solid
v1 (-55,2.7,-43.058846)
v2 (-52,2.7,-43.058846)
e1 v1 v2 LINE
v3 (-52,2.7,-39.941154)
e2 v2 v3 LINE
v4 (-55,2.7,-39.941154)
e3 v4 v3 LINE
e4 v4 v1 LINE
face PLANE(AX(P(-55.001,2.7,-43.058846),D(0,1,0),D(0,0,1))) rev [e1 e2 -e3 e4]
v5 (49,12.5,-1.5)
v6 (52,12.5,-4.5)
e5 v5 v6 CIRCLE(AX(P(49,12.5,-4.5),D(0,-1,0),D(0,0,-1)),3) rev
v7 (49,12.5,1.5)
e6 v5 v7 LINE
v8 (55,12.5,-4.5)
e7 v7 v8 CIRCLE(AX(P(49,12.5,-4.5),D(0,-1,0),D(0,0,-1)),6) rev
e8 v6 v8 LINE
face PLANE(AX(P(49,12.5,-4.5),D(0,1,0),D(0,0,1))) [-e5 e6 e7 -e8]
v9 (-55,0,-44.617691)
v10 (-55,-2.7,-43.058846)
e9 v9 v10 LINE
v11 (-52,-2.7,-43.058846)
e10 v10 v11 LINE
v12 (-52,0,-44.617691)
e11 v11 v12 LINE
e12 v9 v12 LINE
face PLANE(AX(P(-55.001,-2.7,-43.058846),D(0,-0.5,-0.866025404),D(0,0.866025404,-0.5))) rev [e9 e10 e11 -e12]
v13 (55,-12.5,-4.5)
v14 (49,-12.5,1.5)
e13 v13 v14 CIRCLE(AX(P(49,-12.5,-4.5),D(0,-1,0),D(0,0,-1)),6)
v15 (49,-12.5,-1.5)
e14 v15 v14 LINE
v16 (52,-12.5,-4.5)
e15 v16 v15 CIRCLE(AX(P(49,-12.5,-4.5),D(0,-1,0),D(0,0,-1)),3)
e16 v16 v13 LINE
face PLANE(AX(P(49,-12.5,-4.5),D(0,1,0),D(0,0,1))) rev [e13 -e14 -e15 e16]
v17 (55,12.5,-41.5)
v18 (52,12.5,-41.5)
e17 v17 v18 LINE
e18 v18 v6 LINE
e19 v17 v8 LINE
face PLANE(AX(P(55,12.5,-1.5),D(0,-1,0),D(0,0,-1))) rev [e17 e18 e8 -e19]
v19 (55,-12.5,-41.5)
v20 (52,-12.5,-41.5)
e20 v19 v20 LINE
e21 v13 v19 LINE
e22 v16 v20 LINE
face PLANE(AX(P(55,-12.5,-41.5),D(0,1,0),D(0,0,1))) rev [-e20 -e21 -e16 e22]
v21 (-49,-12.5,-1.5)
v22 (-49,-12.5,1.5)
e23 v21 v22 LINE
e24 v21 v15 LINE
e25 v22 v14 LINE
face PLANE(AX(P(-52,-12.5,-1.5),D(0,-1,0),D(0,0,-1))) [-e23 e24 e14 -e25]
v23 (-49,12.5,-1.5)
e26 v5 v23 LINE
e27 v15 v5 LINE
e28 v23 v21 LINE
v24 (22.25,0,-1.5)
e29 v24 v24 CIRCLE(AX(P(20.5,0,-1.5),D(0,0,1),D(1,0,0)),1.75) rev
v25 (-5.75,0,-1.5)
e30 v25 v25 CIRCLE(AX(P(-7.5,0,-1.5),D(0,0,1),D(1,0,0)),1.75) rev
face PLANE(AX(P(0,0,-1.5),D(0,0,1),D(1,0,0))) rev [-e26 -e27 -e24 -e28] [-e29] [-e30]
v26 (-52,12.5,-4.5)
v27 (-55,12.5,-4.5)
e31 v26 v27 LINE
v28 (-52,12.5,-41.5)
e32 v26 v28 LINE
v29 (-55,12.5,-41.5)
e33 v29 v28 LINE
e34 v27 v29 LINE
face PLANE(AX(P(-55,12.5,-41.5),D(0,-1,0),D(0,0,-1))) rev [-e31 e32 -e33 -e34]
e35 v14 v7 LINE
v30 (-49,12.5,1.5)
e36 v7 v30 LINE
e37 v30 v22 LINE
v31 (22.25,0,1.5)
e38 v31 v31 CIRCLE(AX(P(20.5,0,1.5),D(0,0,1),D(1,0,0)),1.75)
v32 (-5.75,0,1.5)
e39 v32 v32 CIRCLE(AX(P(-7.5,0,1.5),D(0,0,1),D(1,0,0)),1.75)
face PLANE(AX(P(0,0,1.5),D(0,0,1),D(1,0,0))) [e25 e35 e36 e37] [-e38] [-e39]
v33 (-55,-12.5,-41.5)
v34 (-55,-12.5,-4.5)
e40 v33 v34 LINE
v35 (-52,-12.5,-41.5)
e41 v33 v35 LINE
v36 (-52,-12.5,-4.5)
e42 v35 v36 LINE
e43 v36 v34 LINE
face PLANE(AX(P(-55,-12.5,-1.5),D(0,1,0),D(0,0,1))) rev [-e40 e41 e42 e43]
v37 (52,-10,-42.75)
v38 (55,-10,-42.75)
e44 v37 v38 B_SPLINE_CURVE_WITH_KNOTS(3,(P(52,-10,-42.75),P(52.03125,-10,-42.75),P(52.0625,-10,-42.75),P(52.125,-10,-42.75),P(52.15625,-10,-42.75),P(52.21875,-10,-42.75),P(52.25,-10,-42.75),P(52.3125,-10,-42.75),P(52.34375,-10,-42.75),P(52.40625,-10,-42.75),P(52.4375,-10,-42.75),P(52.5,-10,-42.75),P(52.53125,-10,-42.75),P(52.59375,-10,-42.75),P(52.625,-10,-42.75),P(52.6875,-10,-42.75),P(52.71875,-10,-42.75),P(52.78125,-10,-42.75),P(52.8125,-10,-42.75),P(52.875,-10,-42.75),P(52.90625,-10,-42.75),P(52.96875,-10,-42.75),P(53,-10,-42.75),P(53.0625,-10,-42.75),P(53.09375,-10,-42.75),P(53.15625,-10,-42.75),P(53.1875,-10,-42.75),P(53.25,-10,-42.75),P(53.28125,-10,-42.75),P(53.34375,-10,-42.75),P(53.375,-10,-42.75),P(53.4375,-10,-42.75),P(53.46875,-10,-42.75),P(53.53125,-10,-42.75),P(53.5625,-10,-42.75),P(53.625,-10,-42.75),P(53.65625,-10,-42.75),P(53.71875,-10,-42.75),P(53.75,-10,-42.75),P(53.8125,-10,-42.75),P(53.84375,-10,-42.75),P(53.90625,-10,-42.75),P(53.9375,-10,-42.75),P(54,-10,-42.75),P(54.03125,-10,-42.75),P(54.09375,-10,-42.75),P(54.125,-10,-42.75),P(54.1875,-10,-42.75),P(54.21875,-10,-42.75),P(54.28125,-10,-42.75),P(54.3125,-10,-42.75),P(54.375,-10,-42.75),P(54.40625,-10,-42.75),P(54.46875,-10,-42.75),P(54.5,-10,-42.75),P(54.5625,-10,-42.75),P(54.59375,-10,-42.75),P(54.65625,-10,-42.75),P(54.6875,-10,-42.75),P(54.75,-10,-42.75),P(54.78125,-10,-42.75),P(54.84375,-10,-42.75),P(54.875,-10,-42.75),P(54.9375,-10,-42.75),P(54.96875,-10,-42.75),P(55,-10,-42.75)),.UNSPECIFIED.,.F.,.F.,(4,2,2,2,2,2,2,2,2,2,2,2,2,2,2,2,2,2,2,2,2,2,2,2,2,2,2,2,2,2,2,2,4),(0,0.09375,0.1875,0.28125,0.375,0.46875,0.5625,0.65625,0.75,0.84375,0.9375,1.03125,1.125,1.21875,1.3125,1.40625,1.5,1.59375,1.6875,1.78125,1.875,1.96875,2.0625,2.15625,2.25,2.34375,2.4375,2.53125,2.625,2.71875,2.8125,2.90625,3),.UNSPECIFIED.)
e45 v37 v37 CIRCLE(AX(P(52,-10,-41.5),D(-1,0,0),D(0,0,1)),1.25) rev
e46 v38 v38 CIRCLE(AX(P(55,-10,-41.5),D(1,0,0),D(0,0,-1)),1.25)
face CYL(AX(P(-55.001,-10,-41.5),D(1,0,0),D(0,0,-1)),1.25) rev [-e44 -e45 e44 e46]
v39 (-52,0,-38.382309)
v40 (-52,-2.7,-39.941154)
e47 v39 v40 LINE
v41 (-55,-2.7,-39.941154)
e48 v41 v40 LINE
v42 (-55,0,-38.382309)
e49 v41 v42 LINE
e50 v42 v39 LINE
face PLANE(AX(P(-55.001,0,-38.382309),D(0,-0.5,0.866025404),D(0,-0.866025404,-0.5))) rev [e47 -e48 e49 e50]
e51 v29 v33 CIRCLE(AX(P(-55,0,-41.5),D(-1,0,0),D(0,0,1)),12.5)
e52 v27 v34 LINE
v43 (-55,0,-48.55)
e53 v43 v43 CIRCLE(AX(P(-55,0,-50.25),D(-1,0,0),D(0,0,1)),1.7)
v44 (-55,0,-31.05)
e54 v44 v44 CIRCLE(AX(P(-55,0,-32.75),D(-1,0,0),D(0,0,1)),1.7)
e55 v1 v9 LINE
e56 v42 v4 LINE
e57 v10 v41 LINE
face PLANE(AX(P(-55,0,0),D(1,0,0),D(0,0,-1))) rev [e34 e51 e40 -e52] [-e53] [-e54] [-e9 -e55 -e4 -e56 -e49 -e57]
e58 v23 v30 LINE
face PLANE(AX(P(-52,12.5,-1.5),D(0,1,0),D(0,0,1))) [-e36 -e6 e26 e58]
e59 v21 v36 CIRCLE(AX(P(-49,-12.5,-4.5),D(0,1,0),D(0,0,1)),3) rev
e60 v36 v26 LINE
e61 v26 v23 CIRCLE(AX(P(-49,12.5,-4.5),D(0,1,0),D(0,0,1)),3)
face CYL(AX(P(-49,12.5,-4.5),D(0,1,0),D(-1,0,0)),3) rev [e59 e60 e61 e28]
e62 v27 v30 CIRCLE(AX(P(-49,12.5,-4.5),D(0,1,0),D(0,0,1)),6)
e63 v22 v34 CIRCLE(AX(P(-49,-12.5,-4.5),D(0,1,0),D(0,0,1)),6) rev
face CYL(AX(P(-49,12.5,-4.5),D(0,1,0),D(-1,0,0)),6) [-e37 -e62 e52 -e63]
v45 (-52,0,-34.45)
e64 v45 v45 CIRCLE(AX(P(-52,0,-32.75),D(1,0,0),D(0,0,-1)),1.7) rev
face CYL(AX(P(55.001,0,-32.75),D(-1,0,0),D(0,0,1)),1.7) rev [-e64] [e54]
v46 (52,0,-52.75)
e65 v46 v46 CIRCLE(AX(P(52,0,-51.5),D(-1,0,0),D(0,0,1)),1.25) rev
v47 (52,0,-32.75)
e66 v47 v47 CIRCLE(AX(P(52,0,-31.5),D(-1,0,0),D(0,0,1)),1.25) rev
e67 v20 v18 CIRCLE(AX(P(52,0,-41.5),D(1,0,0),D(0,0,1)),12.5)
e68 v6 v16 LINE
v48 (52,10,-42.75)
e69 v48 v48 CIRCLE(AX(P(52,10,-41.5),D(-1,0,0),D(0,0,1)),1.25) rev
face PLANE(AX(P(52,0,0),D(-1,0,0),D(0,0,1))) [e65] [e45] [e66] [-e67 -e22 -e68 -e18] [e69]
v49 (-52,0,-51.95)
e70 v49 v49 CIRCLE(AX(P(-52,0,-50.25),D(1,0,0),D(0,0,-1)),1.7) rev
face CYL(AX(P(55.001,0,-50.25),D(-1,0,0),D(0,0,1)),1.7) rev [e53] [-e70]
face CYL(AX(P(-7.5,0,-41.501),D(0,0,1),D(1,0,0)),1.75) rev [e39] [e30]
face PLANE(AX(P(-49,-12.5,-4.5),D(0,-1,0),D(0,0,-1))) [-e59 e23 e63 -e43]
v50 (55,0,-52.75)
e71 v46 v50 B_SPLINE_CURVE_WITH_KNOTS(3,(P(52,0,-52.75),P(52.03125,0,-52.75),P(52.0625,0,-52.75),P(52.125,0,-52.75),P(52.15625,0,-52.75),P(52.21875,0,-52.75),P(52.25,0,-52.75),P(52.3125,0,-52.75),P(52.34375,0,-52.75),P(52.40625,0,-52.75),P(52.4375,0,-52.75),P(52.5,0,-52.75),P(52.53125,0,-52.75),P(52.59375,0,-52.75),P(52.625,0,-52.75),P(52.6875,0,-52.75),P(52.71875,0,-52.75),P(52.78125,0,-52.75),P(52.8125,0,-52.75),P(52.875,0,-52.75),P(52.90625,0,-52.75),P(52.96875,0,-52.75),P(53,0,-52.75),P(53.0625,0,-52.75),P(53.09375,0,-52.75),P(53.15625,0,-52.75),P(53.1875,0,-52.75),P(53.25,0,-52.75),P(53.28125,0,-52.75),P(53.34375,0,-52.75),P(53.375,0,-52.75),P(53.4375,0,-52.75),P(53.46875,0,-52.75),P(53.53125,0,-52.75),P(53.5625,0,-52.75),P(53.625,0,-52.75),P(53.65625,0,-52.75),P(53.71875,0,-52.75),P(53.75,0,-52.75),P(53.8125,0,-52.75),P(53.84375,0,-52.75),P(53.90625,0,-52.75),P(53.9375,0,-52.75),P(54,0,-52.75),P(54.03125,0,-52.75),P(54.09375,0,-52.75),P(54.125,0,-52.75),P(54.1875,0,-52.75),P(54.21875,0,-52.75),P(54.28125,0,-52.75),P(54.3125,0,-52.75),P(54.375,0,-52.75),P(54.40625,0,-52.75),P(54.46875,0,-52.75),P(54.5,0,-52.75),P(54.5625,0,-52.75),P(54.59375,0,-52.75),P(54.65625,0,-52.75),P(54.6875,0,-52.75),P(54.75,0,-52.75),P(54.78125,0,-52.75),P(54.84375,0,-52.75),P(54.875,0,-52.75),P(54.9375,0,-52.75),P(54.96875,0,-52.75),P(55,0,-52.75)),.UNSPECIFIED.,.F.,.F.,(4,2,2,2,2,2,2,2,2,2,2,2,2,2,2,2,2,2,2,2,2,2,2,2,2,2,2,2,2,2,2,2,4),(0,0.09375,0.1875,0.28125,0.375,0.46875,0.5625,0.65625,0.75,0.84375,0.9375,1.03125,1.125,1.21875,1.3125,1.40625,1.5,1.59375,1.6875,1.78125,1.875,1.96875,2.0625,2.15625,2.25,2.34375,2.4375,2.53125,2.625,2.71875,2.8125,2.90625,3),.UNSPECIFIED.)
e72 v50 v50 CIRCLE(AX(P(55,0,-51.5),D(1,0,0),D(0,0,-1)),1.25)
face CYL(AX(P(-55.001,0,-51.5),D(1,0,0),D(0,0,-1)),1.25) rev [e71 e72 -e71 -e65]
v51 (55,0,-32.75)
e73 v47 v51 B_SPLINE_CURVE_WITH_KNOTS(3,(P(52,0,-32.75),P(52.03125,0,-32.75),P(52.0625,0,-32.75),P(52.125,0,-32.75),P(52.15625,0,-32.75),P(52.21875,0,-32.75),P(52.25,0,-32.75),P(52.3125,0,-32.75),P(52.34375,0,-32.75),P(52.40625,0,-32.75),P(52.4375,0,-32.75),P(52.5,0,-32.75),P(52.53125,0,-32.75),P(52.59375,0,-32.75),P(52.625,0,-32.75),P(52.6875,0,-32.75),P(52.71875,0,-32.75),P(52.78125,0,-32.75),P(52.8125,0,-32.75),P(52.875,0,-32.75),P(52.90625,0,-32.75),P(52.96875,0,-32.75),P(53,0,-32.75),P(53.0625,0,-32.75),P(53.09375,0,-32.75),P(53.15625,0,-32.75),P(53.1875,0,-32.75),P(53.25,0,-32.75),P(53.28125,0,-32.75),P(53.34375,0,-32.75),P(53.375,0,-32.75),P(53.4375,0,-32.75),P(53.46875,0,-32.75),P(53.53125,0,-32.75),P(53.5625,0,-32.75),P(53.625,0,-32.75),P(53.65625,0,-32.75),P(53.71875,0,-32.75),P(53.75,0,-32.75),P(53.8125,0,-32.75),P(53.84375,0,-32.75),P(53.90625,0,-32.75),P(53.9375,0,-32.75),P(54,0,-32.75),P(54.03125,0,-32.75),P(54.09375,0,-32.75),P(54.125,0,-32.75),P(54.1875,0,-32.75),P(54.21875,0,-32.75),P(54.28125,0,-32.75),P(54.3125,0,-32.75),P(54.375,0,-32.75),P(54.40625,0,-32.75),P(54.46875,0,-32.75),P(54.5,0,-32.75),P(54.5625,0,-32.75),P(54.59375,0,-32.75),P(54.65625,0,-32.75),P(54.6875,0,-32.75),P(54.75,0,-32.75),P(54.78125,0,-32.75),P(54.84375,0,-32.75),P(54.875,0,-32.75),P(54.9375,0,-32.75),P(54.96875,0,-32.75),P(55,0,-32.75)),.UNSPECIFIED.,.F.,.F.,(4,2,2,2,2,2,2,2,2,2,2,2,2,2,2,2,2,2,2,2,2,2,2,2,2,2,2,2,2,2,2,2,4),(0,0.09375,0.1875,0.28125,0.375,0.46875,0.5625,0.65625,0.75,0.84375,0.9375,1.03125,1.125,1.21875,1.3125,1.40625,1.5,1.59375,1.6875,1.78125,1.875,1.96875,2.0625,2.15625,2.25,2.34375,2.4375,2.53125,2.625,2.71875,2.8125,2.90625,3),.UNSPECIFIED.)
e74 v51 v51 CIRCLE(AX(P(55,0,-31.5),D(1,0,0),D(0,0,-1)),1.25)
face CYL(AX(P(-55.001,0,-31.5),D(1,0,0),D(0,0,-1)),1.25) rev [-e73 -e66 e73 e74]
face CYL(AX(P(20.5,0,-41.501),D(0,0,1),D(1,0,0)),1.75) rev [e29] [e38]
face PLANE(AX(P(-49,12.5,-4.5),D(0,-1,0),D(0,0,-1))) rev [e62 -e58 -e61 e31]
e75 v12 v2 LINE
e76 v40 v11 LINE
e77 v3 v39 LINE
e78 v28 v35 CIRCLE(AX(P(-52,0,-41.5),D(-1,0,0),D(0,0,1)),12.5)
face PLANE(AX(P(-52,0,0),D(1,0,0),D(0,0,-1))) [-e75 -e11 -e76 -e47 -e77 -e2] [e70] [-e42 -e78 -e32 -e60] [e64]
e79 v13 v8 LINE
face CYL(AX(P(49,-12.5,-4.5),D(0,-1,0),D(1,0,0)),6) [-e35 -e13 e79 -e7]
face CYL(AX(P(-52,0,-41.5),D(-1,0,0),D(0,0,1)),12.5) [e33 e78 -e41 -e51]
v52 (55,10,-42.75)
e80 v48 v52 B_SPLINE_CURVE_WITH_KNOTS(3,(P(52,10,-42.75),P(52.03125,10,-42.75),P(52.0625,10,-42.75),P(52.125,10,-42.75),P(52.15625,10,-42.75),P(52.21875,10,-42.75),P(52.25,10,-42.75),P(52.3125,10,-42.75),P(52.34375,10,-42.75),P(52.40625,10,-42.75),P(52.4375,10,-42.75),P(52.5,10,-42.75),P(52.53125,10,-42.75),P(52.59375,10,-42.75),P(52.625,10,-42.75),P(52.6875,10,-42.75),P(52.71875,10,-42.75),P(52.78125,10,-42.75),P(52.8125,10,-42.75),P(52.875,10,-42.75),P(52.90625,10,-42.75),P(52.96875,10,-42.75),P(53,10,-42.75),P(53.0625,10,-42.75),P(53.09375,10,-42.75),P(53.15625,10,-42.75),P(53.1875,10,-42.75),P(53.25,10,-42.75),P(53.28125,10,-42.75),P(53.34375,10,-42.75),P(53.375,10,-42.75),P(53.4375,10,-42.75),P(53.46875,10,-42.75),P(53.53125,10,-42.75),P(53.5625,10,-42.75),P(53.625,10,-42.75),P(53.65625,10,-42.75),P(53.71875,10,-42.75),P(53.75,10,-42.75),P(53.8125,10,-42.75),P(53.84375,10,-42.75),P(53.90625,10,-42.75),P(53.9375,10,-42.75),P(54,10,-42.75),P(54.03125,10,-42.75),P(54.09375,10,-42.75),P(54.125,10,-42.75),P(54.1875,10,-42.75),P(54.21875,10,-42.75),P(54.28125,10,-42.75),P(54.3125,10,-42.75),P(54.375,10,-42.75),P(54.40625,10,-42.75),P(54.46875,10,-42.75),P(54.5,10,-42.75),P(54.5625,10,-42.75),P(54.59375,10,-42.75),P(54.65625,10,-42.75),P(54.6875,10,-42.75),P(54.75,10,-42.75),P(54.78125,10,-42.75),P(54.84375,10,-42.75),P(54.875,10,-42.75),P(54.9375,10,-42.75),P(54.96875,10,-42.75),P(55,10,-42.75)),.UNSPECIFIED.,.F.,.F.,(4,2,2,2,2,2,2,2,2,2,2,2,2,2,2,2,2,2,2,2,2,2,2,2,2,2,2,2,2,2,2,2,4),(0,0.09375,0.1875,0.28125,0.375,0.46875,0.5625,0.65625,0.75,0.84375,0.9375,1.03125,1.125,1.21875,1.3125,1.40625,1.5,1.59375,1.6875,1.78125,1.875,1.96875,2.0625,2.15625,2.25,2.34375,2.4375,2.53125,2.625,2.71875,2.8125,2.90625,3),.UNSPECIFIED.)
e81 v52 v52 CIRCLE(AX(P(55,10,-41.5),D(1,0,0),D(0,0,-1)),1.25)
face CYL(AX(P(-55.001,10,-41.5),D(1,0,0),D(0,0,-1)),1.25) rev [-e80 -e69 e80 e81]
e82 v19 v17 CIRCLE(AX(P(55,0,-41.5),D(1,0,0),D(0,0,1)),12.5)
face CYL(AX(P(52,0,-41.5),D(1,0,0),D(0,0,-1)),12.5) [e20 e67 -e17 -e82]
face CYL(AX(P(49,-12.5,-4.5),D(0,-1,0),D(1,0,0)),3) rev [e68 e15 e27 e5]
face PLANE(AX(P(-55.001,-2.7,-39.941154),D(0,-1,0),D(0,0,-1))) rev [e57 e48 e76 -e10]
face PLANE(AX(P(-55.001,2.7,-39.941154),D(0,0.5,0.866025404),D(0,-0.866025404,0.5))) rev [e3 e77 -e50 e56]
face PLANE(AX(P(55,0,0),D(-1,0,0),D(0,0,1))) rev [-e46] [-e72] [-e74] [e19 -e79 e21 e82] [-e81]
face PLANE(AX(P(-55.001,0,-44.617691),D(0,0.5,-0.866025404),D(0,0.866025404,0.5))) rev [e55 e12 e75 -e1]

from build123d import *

# Parameters (mm, degrees)
T_LE_START                            = -1.5
T_LE_DE_BASE_PLI_E2_OUTLINE_W         = 104
T_LE_DE_BASE_PLI_E2_OUTLINE_H         = 25
T_LE_DE_BASE_PLI_E2_DEPTH             = 3
T_LE_PLI_E_SUR_AR_TE1_STRIP_W         = 18
T_LE_PLI_E_SUR_AR_TE1_STRIP_H         = 3
T_LE_PLI_E_SUR_AR_TE1_STRIP_CUT_DEPTH = 25
T_LE_PLI_E_SUR_AR_TE1_DEPTH           = 25
T_LE_PLI_E_SUR_AR_TE2_STRIP_W         = 18
T_LE_PLI_E_SUR_AR_TE2_STRIP_H         = 3
T_LE_PLI_E_SUR_AR_TE2_STRIP_CUT_DEPTH = 25
T_LE_PLI_E_SUR_AR_TE2_DEPTH           = 25
ENL_V_MAT_EXTRU_1_REACH               = 72.924
ESQUISSE20_R                          = 1.75
PATTE1_DEPTH                          = 3
PATTE2_START                          = -3
PATTE2_DEPTH                          = 3
ENL_V_MAT_EXTRU_2_REACH               = 125.176
ESQUISSE27_R                          = 1.25
ENL_V_MAT_EXTRU_3_REACH               = 122.504
ENL_V_MAT_EXTRU_4_REACH               = 125.176
ESQUISSE29_R                          = 1.7


# Read off the part's stored shape, not the designer's step: Tôle de base pliée2
# Sheet-metal steps are written as plain solids
with BuildPart() as part:
    # Tôle de base pliée2 outline → Tôle de base pliée2 (new body)
    with BuildSketch(Plane.XY.offset(T_LE_START)):
        Rectangle(T_LE_DE_BASE_PLI_E2_OUTLINE_W, T_LE_DE_BASE_PLI_E2_OUTLINE_H)
    extrude(amount=T_LE_DE_BASE_PLI_E2_DEPTH)

    # Tôle pliée sur arête1 strip (across the edge) → Tôle pliée sur arête1 strip cut (cut)
    with BuildSketch(Plane(origin=(52, 12.5, -1.5), x_dir=(-1, 0, 0), z_dir=(0, -1, 0))):
        with Locations((-6, -1.5)):
            Rectangle(T_LE_PLI_E_SUR_AR_TE1_STRIP_W, T_LE_PLI_E_SUR_AR_TE1_STRIP_H)
    extrude(amount=T_LE_PLI_E_SUR_AR_TE1_STRIP_CUT_DEPTH, mode=Mode.SUBTRACT)

    # Tôle pliée sur arête1 section (across the edge) → Tôle pliée sur arête1 (add)
    with BuildSketch(Plane(origin=(52, 12.5, -1.5), x_dir=(-1, 0, 0), z_dir=(0, -1, 0))):
        with BuildLine():
            Line((-3, 3), (-3, 40))
            Line((-3, 40), (0, 40))
            Line((0, 40), (0, 3))
            ThreePointArc((0, 3), (0.878679656, 0.878679656), (3, 0))
            Line((3, 0), (3, -3))
            ThreePointArc((3, -3), (-1.242640687, -1.242640687), (-3, 3))
        make_face()
    extrude(amount=T_LE_PLI_E_SUR_AR_TE1_DEPTH)

    # Tôle pliée sur arête2 strip (across the edge) → Tôle pliée sur arête2 strip cut (cut)
    with BuildSketch(Plane(origin=(-52, -12.5, -1.5), x_dir=(1, 0, 0), z_dir=(0, 1, 0))):
        with Locations((-6, -1.5)):
            Rectangle(T_LE_PLI_E_SUR_AR_TE2_STRIP_W, T_LE_PLI_E_SUR_AR_TE2_STRIP_H)
    extrude(amount=T_LE_PLI_E_SUR_AR_TE2_STRIP_CUT_DEPTH, mode=Mode.SUBTRACT)

    # Tôle pliée sur arête2 section (across the edge) → Tôle pliée sur arête2 (add)
    with BuildSketch(Plane(origin=(-52, -12.5, -1.5), x_dir=(1, 0, 0), z_dir=(0, 1, 0))):
        with BuildLine():
            Line((-3, 3), (-3, 40))
            Line((-3, 40), (0, 40))
            Line((0, 40), (0, 3))
            ThreePointArc((0, 3), (0.878679656, 0.878679656), (3, 0))
            Line((3, 0), (3, -3))
            ThreePointArc((3, -3), (-1.242640687, -1.242640687), (-3, 3))
        make_face()
    extrude(amount=T_LE_PLI_E_SUR_AR_TE2_DEPTH)

    # Esquisse20 → Enlèv. mat.-Extru.1 (cut, up to next)
    with BuildSketch(Plane.XY.offset(1.5), mode=Mode.PRIVATE) as enl_v_mat_extru_1_sk1:
        with Locations((-7.5, 0)):
            Circle(ESQUISSE20_R)
    enl_v_mat_extru_1_tool1 = extrude(enl_v_mat_extru_1_sk1.sketch, amount=-ENL_V_MAT_EXTRU_1_REACH, mode=Mode.PRIVATE) & part.part
    # Esquisse20 → Enlèv. mat.-Extru.1 (cut, up to next)
    with BuildSketch(Plane.XY.offset(1.5), mode=Mode.PRIVATE) as enl_v_mat_extru_1_sk2:
        with Locations((20.5, 0)):
            Circle(ESQUISSE20_R)
    enl_v_mat_extru_1_tool2 = extrude(enl_v_mat_extru_1_sk2.sketch, amount=-ENL_V_MAT_EXTRU_1_REACH, mode=Mode.PRIVATE) & part.part
    add(enl_v_mat_extru_1_tool1.solids().sort_by_distance((-7.5, 0, 1.5))[0], mode=Mode.SUBTRACT)
    add(enl_v_mat_extru_1_tool2.solids().sort_by_distance((20.5, 0, 1.5))[0], mode=Mode.SUBTRACT)

    # Esquisse21 → Patte1 (add)
    with BuildSketch(Plane.ZY.offset(55)):
        with BuildLine():
            Line((-41.5, 12.5), (-41.5, -12.5))
            ThreePointArc((-41.5, -12.5), (-54, 0), (-41.5, 12.5))
        make_face()
    extrude(amount=-PATTE1_DEPTH)

    # Esquisse24 → Patte2 (add)
    with BuildSketch(Plane(origin=(55, 0, 0), x_dir=(0, 0, -1), z_dir=(1, 0, 0)).offset(PATTE2_START)):
        with BuildLine():
            Line((41.5, 12.5), (41.5, -12.5))
            ThreePointArc((41.5, -12.5), (54, 0), (41.5, 12.5))
        make_face()
    extrude(amount=PATTE2_DEPTH)

    # Esquisse27 → Enlèv. mat.-Extru.2 (cut, up to next)
    with BuildSketch(Plane(origin=(55, 0, 0), x_dir=(0, 0, -1), z_dir=(1, 0, 0)), mode=Mode.PRIVATE) as enl_v_mat_extru_2_sk1:
        with Locations((51.5, 0)):
            Circle(ESQUISSE27_R)
    enl_v_mat_extru_2_tool1 = extrude(enl_v_mat_extru_2_sk1.sketch, amount=-ENL_V_MAT_EXTRU_2_REACH, mode=Mode.PRIVATE) & part.part
    # Esquisse27 → Enlèv. mat.-Extru.2 (cut, up to next)
    with BuildSketch(Plane(origin=(55, 0, 0), x_dir=(0, 0, -1), z_dir=(1, 0, 0)), mode=Mode.PRIVATE) as enl_v_mat_extru_2_sk2:
        with Locations((41.5, -10)):
            Circle(ESQUISSE27_R)
    enl_v_mat_extru_2_tool2 = extrude(enl_v_mat_extru_2_sk2.sketch, amount=-ENL_V_MAT_EXTRU_2_REACH, mode=Mode.PRIVATE) & part.part
    # Esquisse27 → Enlèv. mat.-Extru.2 (cut, up to next)
    with BuildSketch(Plane(origin=(55, 0, 0), x_dir=(0, 0, -1), z_dir=(1, 0, 0)), mode=Mode.PRIVATE) as enl_v_mat_extru_2_sk3:
        with Locations((31.5, 0)):
            Circle(ESQUISSE27_R)
    enl_v_mat_extru_2_tool3 = extrude(enl_v_mat_extru_2_sk3.sketch, amount=-ENL_V_MAT_EXTRU_2_REACH, mode=Mode.PRIVATE) & part.part
    # Esquisse27 → Enlèv. mat.-Extru.2 (cut, up to next)
    with BuildSketch(Plane(origin=(55, 0, 0), x_dir=(0, 0, -1), z_dir=(1, 0, 0)), mode=Mode.PRIVATE) as enl_v_mat_extru_2_sk4:
        with Locations((41.5, 10)):
            Circle(ESQUISSE27_R)
    enl_v_mat_extru_2_tool4 = extrude(enl_v_mat_extru_2_sk4.sketch, amount=-ENL_V_MAT_EXTRU_2_REACH, mode=Mode.PRIVATE) & part.part
    add(enl_v_mat_extru_2_tool1.solids().sort_by_distance((55, 0, -51.5))[0], mode=Mode.SUBTRACT)
    add(enl_v_mat_extru_2_tool2.solids().sort_by_distance((55, -10, -41.5))[0], mode=Mode.SUBTRACT)
    add(enl_v_mat_extru_2_tool3.solids().sort_by_distance((55, 0, -31.5))[0], mode=Mode.SUBTRACT)
    add(enl_v_mat_extru_2_tool4.solids().sort_by_distance((55, 10, -41.5))[0], mode=Mode.SUBTRACT)

    # Esquisse28 → Enlèv. mat.-Extru.3 (cut, up to next)
    with BuildSketch(Plane(origin=(-52, 0, 0), x_dir=(0, 0, -1), z_dir=(1, 0, 0)), mode=Mode.PRIVATE) as enl_v_mat_extru_3_sk1:
        Polygon((43.058845727, -2.7), (44.617691454, 0), (43.058845727, 2.7), (39.941154273, 2.7), (38.382308546, 0), (39.941154273, -2.7), align=None)
    enl_v_mat_extru_3_tool1 = extrude(enl_v_mat_extru_3_sk1.sketch, amount=-ENL_V_MAT_EXTRU_3_REACH, mode=Mode.PRIVATE) & part.part
    add(enl_v_mat_extru_3_tool1.solids().sort_by_distance((-52, 0, -41.5))[0], mode=Mode.SUBTRACT)

    # Esquisse29 → Enlèv. mat.-Extru.4 (cut, up to next)
    with BuildSketch(Plane.ZY.offset(55), mode=Mode.PRIVATE) as enl_v_mat_extru_4_sk1:
        with Locations((-50.25, 0)):
            Circle(ESQUISSE29_R)
    enl_v_mat_extru_4_tool1 = extrude(enl_v_mat_extru_4_sk1.sketch, amount=-ENL_V_MAT_EXTRU_4_REACH, mode=Mode.PRIVATE) & part.part
    # Esquisse29 → Enlèv. mat.-Extru.4 (cut, up to next)
    with BuildSketch(Plane.ZY.offset(55), mode=Mode.PRIVATE) as enl_v_mat_extru_4_sk2:
        with Locations((-32.75, 0)):
            Circle(ESQUISSE29_R)
    enl_v_mat_extru_4_tool2 = extrude(enl_v_mat_extru_4_sk2.sketch, amount=-ENL_V_MAT_EXTRU_4_REACH, mode=Mode.PRIVATE) & part.part
    add(enl_v_mat_extru_4_tool1.solids().sort_by_distance((-55, 0, -50.25))[0], mode=Mode.SUBTRACT)
    add(enl_v_mat_extru_4_tool2.solids().sort_by_distance((-55, 0, -32.75))[0], mode=Mode.SUBTRACT)


solid = part.part
